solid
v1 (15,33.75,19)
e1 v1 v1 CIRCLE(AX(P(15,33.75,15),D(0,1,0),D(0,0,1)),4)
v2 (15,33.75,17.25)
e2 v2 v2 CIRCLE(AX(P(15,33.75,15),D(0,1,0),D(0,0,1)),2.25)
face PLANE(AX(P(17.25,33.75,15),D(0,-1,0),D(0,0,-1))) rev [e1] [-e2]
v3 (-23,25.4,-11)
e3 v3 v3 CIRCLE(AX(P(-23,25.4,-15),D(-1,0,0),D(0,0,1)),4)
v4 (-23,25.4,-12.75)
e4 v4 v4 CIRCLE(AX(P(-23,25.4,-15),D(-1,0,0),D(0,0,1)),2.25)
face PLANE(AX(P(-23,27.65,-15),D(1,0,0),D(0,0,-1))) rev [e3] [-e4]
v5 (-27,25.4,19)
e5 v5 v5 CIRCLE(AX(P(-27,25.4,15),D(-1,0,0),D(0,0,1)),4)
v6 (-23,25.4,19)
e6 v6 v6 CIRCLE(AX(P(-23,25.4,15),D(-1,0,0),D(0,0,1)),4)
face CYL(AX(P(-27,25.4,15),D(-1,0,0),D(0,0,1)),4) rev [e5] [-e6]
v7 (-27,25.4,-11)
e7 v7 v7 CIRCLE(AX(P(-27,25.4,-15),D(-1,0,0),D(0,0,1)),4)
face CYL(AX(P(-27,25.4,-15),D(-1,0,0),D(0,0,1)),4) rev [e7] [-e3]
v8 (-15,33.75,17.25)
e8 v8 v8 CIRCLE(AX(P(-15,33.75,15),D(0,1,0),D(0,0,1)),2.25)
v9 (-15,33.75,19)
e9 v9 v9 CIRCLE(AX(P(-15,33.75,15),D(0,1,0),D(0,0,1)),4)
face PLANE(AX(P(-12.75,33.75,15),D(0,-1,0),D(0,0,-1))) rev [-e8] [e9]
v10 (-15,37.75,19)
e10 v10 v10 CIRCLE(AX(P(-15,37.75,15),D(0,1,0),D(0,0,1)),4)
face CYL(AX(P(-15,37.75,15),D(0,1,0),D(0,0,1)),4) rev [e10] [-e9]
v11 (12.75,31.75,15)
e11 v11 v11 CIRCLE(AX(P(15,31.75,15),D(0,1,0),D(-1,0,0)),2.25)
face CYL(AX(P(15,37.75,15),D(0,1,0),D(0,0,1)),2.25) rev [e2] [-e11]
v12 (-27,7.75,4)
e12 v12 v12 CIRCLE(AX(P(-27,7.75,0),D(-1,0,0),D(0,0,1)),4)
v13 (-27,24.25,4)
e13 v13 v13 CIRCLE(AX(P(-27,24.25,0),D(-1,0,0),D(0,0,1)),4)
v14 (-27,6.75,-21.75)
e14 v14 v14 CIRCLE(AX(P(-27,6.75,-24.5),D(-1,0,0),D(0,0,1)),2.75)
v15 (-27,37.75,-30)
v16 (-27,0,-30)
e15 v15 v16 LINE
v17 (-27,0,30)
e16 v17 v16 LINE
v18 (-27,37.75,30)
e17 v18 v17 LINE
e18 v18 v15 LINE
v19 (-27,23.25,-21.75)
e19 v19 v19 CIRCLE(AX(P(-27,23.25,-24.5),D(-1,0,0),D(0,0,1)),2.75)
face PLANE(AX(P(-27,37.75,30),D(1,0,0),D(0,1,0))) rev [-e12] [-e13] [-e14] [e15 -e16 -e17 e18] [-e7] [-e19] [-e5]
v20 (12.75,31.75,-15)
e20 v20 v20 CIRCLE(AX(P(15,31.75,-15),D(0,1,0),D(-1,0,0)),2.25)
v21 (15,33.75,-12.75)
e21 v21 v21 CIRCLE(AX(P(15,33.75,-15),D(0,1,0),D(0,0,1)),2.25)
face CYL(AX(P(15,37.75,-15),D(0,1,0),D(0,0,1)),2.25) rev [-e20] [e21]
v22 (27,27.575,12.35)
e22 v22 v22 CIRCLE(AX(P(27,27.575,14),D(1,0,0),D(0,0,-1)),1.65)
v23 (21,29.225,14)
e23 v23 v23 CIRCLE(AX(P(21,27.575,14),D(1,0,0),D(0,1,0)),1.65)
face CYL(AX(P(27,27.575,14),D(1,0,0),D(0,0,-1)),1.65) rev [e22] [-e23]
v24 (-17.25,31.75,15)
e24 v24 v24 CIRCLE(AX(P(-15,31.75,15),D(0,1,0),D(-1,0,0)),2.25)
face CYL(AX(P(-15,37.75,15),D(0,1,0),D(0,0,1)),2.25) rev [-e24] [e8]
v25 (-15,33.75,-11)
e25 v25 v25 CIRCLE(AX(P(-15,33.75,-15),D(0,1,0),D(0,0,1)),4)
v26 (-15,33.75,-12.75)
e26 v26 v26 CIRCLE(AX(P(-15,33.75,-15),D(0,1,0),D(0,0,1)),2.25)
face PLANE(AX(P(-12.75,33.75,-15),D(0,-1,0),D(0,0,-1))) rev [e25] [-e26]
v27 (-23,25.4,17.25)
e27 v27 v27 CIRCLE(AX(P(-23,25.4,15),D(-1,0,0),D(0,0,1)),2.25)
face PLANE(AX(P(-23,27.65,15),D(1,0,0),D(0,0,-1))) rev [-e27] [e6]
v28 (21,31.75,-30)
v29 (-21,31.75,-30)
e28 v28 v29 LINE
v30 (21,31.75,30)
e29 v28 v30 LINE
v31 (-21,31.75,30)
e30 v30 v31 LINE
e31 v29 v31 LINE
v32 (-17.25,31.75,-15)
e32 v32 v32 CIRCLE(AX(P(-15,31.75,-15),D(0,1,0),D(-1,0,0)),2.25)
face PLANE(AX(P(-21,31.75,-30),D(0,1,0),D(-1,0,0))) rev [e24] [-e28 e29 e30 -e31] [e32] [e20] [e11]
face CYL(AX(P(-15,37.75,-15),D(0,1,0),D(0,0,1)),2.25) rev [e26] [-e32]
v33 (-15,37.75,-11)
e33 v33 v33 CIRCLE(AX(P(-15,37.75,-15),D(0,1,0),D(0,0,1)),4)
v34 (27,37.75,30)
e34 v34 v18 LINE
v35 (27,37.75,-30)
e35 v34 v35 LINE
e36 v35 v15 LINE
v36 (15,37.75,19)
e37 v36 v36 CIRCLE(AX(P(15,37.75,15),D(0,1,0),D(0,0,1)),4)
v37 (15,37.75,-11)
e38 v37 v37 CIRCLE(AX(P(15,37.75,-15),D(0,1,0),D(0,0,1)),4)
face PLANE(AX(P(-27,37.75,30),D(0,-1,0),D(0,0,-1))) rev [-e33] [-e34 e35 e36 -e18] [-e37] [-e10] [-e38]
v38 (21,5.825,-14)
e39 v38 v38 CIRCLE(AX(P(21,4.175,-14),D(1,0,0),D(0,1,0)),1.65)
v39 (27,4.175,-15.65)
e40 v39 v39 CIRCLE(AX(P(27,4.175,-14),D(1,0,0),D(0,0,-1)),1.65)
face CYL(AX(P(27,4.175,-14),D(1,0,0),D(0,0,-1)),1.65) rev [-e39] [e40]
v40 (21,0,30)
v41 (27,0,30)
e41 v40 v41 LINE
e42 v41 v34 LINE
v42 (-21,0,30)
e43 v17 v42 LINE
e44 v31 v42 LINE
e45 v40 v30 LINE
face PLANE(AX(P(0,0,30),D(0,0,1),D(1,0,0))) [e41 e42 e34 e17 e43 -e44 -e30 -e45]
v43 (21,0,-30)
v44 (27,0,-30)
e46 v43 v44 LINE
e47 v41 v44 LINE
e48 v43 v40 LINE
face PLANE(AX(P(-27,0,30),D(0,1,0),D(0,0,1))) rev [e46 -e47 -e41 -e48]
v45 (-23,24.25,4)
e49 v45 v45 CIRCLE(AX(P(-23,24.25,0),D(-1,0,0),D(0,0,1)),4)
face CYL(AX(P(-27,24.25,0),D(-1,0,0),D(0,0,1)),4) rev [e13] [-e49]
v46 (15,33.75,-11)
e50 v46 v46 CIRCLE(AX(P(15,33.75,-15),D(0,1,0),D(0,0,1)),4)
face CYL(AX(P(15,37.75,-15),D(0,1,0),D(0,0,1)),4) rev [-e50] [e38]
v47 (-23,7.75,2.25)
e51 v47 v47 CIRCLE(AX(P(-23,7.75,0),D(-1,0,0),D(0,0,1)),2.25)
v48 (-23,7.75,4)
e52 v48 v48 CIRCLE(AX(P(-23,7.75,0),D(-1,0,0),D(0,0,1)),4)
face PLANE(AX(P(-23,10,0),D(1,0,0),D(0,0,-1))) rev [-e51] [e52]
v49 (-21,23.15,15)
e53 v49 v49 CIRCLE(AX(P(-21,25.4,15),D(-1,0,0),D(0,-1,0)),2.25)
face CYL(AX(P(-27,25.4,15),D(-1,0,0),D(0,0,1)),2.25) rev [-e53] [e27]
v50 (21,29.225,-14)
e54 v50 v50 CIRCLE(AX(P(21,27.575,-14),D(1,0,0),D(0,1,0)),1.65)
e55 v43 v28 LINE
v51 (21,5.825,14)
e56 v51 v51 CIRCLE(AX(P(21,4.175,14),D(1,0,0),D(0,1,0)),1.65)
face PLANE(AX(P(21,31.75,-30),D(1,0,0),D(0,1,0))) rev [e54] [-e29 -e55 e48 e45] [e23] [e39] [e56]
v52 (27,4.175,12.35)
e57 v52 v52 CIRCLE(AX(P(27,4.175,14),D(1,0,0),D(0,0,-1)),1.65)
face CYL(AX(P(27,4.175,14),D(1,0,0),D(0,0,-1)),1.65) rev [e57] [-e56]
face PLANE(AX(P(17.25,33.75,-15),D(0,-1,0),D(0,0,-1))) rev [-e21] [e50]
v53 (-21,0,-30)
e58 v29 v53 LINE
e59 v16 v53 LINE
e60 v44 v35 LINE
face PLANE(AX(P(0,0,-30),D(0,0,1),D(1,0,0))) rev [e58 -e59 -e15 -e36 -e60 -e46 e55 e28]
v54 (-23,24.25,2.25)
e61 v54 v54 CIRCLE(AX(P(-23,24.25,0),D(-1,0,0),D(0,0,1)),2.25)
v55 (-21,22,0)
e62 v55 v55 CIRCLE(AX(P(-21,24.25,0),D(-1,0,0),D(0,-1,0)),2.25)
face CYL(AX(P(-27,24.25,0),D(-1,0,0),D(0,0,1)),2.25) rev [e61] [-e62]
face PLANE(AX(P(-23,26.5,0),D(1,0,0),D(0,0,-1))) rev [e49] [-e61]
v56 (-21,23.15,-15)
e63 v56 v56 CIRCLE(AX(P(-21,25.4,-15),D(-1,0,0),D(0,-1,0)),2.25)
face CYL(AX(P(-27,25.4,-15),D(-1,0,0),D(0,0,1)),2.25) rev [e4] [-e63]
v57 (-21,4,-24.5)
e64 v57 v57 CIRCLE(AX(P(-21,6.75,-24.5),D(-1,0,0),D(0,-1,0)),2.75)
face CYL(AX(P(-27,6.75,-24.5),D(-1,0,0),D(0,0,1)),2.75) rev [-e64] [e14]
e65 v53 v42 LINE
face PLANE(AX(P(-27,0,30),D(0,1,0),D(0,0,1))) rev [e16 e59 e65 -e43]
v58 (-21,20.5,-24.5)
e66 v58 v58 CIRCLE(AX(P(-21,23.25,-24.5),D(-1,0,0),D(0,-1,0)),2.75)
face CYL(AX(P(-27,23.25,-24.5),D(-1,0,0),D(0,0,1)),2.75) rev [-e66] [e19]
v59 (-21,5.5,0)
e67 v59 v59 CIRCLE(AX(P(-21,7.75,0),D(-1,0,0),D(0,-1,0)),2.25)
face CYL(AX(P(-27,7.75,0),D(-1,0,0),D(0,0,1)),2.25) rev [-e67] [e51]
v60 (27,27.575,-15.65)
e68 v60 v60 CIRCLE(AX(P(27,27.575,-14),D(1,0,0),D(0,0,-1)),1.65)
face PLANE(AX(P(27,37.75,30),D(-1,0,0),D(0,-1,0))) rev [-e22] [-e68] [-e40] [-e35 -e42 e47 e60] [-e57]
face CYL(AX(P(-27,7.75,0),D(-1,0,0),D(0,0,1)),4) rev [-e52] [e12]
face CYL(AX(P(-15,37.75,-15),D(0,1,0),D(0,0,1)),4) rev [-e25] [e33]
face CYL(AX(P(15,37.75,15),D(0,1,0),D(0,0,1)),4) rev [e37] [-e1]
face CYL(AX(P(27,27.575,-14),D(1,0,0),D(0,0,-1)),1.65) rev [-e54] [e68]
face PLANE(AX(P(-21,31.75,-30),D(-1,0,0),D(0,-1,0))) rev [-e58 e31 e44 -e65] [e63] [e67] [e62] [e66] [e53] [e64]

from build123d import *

# Parameters (mm, degrees)
SKETCH1_W                      = 54
SKETCH1_H                      = 37.75
BOSS_EXTRUDE1_DEPTH            = 30
SKETCH2_W                      = 42
SKETCH2_H                      = 31.75
CUT_EXTRUDE1_DEPTH             = 76.855537042
CBORE_FOR_M4_SHCS1_D           = 4.5
CBORE_FOR_M4_SHCS1_DEPTH       = 6
CBORE_FOR_M4_SHCS1_CBORE_D     = 8
CBORE_FOR_M4_SHCS1_CBORE_DEPTH = 4
M5_CLEARANCE_HOLE1_D           = 5.5
M5_CLEARANCE_HOLE1_DEPTH       = 6
CBORE_START                    = 33.75
CBORE_FOR_M4_SHCS2_OUTLINE_R   = 4
CBORE_FOR_M4_SHCS2_DEPTH       = 4
CBORE_START_2                  = 31.75
CBORE_FOR_M4_SHCS2_2_OUTLINE_R = 2.25
CBORE_FOR_M4_SHCS2_2_DEPTH     = 2
M4X0_7_START                   = 21
M4X0_7_TAPPED_HOLE1_OUTLINE_R  = 1.65
M4X0_7_TAPPED_HOLE1_DEPTH      = 6


# Read off the part's stored shape, not the designer's step: CBORE for M4 SHCS2, M4x0.7 Tapped Hole1
with BuildPart() as part:
    # Sketch1 → Boss-Extrude1 (new, symmetric)
    with BuildSketch(Plane.XY):
        with Locations((0, 18.875)):
            Rectangle(SKETCH1_W, SKETCH1_H)
    extrude(amount=BOSS_EXTRUDE1_DEPTH, both=True)

    # Sketch2 → Cut-Extrude1 (cut, through all)
    with BuildSketch(Plane.XY.offset(30)):
        with Locations((0, 15.875)):
            Rectangle(SKETCH2_W, SKETCH2_H)
    extrude(amount=-CUT_EXTRUDE1_DEPTH, mode=Mode.SUBTRACT)

    # CBORE for M4 SHCS1
    with Locations(Plane.ZY.offset(27)):
        with Locations((15, 25.4), (0, 24.25), (0, 7.75), (-15, 25.4)):
            CounterBoreHole(CBORE_FOR_M4_SHCS1_D / 2, CBORE_FOR_M4_SHCS1_CBORE_D / 2, CBORE_FOR_M4_SHCS1_CBORE_DEPTH, depth=CBORE_FOR_M4_SHCS1_DEPTH)

    # M5 Clearance Hole1
    with Locations(Plane.ZY.offset(27)):
        with Locations((-24.5, 23.25), (-24.5, 6.75)):
            Hole(M5_CLEARANCE_HOLE1_D / 2, depth=M5_CLEARANCE_HOLE1_DEPTH)

    # CBORE for M4 SHCS2 outline → CBORE for M4 SHCS2 (cut)
    with BuildSketch(Plane(origin=(0, 0, 0), x_dir=(1, 0, 0), z_dir=(0, 1, 0)).offset(CBORE_START)):
        with Locations((15, 15)):
            Circle(CBORE_FOR_M4_SHCS2_OUTLINE_R)
        with Locations((-15, -15)):
            Circle(CBORE_FOR_M4_SHCS2_OUTLINE_R)
        with Locations((-15, 15)):
            Circle(CBORE_FOR_M4_SHCS2_OUTLINE_R)
        with Locations((15, -15)):
            Circle(CBORE_FOR_M4_SHCS2_OUTLINE_R)
    extrude(amount=CBORE_FOR_M4_SHCS2_DEPTH, mode=Mode.SUBTRACT)

    # CBORE for M4 SHCS2 2 outline → CBORE for M4 SHCS2 2 (cut)
    with BuildSketch(Plane(origin=(0, 0, 0), x_dir=(1, 0, 0), z_dir=(0, 1, 0)).offset(CBORE_START_2)):
        with Locations((15, 15)):
            Circle(CBORE_FOR_M4_SHCS2_2_OUTLINE_R)
        with Locations((-15, -15)):
            Circle(CBORE_FOR_M4_SHCS2_2_OUTLINE_R)
        with Locations((-15, 15)):
            Circle(CBORE_FOR_M4_SHCS2_2_OUTLINE_R)
        with Locations((15, -15)):
            Circle(CBORE_FOR_M4_SHCS2_2_OUTLINE_R)
    extrude(amount=CBORE_FOR_M4_SHCS2_2_DEPTH, mode=Mode.SUBTRACT)

    # M4x0.7 Tapped Hole1 outline → M4x0.7 Tapped Hole1 (cut)
    with BuildSketch(Plane.YZ.offset(M4X0_7_START)):
        with Locations((27.575, 14)):
            Circle(M4X0_7_TAPPED_HOLE1_OUTLINE_R)
        with Locations((4.175, -14)):
            Circle(M4X0_7_TAPPED_HOLE1_OUTLINE_R)
        with Locations((27.575, -14)):
            Circle(M4X0_7_TAPPED_HOLE1_OUTLINE_R)
        with Locations((4.175, 14)):
            Circle(M4X0_7_TAPPED_HOLE1_OUTLINE_R)
    extrude(amount=M4X0_7_TAPPED_HOLE1_DEPTH, mode=Mode.SUBTRACT)


solid = part.part
